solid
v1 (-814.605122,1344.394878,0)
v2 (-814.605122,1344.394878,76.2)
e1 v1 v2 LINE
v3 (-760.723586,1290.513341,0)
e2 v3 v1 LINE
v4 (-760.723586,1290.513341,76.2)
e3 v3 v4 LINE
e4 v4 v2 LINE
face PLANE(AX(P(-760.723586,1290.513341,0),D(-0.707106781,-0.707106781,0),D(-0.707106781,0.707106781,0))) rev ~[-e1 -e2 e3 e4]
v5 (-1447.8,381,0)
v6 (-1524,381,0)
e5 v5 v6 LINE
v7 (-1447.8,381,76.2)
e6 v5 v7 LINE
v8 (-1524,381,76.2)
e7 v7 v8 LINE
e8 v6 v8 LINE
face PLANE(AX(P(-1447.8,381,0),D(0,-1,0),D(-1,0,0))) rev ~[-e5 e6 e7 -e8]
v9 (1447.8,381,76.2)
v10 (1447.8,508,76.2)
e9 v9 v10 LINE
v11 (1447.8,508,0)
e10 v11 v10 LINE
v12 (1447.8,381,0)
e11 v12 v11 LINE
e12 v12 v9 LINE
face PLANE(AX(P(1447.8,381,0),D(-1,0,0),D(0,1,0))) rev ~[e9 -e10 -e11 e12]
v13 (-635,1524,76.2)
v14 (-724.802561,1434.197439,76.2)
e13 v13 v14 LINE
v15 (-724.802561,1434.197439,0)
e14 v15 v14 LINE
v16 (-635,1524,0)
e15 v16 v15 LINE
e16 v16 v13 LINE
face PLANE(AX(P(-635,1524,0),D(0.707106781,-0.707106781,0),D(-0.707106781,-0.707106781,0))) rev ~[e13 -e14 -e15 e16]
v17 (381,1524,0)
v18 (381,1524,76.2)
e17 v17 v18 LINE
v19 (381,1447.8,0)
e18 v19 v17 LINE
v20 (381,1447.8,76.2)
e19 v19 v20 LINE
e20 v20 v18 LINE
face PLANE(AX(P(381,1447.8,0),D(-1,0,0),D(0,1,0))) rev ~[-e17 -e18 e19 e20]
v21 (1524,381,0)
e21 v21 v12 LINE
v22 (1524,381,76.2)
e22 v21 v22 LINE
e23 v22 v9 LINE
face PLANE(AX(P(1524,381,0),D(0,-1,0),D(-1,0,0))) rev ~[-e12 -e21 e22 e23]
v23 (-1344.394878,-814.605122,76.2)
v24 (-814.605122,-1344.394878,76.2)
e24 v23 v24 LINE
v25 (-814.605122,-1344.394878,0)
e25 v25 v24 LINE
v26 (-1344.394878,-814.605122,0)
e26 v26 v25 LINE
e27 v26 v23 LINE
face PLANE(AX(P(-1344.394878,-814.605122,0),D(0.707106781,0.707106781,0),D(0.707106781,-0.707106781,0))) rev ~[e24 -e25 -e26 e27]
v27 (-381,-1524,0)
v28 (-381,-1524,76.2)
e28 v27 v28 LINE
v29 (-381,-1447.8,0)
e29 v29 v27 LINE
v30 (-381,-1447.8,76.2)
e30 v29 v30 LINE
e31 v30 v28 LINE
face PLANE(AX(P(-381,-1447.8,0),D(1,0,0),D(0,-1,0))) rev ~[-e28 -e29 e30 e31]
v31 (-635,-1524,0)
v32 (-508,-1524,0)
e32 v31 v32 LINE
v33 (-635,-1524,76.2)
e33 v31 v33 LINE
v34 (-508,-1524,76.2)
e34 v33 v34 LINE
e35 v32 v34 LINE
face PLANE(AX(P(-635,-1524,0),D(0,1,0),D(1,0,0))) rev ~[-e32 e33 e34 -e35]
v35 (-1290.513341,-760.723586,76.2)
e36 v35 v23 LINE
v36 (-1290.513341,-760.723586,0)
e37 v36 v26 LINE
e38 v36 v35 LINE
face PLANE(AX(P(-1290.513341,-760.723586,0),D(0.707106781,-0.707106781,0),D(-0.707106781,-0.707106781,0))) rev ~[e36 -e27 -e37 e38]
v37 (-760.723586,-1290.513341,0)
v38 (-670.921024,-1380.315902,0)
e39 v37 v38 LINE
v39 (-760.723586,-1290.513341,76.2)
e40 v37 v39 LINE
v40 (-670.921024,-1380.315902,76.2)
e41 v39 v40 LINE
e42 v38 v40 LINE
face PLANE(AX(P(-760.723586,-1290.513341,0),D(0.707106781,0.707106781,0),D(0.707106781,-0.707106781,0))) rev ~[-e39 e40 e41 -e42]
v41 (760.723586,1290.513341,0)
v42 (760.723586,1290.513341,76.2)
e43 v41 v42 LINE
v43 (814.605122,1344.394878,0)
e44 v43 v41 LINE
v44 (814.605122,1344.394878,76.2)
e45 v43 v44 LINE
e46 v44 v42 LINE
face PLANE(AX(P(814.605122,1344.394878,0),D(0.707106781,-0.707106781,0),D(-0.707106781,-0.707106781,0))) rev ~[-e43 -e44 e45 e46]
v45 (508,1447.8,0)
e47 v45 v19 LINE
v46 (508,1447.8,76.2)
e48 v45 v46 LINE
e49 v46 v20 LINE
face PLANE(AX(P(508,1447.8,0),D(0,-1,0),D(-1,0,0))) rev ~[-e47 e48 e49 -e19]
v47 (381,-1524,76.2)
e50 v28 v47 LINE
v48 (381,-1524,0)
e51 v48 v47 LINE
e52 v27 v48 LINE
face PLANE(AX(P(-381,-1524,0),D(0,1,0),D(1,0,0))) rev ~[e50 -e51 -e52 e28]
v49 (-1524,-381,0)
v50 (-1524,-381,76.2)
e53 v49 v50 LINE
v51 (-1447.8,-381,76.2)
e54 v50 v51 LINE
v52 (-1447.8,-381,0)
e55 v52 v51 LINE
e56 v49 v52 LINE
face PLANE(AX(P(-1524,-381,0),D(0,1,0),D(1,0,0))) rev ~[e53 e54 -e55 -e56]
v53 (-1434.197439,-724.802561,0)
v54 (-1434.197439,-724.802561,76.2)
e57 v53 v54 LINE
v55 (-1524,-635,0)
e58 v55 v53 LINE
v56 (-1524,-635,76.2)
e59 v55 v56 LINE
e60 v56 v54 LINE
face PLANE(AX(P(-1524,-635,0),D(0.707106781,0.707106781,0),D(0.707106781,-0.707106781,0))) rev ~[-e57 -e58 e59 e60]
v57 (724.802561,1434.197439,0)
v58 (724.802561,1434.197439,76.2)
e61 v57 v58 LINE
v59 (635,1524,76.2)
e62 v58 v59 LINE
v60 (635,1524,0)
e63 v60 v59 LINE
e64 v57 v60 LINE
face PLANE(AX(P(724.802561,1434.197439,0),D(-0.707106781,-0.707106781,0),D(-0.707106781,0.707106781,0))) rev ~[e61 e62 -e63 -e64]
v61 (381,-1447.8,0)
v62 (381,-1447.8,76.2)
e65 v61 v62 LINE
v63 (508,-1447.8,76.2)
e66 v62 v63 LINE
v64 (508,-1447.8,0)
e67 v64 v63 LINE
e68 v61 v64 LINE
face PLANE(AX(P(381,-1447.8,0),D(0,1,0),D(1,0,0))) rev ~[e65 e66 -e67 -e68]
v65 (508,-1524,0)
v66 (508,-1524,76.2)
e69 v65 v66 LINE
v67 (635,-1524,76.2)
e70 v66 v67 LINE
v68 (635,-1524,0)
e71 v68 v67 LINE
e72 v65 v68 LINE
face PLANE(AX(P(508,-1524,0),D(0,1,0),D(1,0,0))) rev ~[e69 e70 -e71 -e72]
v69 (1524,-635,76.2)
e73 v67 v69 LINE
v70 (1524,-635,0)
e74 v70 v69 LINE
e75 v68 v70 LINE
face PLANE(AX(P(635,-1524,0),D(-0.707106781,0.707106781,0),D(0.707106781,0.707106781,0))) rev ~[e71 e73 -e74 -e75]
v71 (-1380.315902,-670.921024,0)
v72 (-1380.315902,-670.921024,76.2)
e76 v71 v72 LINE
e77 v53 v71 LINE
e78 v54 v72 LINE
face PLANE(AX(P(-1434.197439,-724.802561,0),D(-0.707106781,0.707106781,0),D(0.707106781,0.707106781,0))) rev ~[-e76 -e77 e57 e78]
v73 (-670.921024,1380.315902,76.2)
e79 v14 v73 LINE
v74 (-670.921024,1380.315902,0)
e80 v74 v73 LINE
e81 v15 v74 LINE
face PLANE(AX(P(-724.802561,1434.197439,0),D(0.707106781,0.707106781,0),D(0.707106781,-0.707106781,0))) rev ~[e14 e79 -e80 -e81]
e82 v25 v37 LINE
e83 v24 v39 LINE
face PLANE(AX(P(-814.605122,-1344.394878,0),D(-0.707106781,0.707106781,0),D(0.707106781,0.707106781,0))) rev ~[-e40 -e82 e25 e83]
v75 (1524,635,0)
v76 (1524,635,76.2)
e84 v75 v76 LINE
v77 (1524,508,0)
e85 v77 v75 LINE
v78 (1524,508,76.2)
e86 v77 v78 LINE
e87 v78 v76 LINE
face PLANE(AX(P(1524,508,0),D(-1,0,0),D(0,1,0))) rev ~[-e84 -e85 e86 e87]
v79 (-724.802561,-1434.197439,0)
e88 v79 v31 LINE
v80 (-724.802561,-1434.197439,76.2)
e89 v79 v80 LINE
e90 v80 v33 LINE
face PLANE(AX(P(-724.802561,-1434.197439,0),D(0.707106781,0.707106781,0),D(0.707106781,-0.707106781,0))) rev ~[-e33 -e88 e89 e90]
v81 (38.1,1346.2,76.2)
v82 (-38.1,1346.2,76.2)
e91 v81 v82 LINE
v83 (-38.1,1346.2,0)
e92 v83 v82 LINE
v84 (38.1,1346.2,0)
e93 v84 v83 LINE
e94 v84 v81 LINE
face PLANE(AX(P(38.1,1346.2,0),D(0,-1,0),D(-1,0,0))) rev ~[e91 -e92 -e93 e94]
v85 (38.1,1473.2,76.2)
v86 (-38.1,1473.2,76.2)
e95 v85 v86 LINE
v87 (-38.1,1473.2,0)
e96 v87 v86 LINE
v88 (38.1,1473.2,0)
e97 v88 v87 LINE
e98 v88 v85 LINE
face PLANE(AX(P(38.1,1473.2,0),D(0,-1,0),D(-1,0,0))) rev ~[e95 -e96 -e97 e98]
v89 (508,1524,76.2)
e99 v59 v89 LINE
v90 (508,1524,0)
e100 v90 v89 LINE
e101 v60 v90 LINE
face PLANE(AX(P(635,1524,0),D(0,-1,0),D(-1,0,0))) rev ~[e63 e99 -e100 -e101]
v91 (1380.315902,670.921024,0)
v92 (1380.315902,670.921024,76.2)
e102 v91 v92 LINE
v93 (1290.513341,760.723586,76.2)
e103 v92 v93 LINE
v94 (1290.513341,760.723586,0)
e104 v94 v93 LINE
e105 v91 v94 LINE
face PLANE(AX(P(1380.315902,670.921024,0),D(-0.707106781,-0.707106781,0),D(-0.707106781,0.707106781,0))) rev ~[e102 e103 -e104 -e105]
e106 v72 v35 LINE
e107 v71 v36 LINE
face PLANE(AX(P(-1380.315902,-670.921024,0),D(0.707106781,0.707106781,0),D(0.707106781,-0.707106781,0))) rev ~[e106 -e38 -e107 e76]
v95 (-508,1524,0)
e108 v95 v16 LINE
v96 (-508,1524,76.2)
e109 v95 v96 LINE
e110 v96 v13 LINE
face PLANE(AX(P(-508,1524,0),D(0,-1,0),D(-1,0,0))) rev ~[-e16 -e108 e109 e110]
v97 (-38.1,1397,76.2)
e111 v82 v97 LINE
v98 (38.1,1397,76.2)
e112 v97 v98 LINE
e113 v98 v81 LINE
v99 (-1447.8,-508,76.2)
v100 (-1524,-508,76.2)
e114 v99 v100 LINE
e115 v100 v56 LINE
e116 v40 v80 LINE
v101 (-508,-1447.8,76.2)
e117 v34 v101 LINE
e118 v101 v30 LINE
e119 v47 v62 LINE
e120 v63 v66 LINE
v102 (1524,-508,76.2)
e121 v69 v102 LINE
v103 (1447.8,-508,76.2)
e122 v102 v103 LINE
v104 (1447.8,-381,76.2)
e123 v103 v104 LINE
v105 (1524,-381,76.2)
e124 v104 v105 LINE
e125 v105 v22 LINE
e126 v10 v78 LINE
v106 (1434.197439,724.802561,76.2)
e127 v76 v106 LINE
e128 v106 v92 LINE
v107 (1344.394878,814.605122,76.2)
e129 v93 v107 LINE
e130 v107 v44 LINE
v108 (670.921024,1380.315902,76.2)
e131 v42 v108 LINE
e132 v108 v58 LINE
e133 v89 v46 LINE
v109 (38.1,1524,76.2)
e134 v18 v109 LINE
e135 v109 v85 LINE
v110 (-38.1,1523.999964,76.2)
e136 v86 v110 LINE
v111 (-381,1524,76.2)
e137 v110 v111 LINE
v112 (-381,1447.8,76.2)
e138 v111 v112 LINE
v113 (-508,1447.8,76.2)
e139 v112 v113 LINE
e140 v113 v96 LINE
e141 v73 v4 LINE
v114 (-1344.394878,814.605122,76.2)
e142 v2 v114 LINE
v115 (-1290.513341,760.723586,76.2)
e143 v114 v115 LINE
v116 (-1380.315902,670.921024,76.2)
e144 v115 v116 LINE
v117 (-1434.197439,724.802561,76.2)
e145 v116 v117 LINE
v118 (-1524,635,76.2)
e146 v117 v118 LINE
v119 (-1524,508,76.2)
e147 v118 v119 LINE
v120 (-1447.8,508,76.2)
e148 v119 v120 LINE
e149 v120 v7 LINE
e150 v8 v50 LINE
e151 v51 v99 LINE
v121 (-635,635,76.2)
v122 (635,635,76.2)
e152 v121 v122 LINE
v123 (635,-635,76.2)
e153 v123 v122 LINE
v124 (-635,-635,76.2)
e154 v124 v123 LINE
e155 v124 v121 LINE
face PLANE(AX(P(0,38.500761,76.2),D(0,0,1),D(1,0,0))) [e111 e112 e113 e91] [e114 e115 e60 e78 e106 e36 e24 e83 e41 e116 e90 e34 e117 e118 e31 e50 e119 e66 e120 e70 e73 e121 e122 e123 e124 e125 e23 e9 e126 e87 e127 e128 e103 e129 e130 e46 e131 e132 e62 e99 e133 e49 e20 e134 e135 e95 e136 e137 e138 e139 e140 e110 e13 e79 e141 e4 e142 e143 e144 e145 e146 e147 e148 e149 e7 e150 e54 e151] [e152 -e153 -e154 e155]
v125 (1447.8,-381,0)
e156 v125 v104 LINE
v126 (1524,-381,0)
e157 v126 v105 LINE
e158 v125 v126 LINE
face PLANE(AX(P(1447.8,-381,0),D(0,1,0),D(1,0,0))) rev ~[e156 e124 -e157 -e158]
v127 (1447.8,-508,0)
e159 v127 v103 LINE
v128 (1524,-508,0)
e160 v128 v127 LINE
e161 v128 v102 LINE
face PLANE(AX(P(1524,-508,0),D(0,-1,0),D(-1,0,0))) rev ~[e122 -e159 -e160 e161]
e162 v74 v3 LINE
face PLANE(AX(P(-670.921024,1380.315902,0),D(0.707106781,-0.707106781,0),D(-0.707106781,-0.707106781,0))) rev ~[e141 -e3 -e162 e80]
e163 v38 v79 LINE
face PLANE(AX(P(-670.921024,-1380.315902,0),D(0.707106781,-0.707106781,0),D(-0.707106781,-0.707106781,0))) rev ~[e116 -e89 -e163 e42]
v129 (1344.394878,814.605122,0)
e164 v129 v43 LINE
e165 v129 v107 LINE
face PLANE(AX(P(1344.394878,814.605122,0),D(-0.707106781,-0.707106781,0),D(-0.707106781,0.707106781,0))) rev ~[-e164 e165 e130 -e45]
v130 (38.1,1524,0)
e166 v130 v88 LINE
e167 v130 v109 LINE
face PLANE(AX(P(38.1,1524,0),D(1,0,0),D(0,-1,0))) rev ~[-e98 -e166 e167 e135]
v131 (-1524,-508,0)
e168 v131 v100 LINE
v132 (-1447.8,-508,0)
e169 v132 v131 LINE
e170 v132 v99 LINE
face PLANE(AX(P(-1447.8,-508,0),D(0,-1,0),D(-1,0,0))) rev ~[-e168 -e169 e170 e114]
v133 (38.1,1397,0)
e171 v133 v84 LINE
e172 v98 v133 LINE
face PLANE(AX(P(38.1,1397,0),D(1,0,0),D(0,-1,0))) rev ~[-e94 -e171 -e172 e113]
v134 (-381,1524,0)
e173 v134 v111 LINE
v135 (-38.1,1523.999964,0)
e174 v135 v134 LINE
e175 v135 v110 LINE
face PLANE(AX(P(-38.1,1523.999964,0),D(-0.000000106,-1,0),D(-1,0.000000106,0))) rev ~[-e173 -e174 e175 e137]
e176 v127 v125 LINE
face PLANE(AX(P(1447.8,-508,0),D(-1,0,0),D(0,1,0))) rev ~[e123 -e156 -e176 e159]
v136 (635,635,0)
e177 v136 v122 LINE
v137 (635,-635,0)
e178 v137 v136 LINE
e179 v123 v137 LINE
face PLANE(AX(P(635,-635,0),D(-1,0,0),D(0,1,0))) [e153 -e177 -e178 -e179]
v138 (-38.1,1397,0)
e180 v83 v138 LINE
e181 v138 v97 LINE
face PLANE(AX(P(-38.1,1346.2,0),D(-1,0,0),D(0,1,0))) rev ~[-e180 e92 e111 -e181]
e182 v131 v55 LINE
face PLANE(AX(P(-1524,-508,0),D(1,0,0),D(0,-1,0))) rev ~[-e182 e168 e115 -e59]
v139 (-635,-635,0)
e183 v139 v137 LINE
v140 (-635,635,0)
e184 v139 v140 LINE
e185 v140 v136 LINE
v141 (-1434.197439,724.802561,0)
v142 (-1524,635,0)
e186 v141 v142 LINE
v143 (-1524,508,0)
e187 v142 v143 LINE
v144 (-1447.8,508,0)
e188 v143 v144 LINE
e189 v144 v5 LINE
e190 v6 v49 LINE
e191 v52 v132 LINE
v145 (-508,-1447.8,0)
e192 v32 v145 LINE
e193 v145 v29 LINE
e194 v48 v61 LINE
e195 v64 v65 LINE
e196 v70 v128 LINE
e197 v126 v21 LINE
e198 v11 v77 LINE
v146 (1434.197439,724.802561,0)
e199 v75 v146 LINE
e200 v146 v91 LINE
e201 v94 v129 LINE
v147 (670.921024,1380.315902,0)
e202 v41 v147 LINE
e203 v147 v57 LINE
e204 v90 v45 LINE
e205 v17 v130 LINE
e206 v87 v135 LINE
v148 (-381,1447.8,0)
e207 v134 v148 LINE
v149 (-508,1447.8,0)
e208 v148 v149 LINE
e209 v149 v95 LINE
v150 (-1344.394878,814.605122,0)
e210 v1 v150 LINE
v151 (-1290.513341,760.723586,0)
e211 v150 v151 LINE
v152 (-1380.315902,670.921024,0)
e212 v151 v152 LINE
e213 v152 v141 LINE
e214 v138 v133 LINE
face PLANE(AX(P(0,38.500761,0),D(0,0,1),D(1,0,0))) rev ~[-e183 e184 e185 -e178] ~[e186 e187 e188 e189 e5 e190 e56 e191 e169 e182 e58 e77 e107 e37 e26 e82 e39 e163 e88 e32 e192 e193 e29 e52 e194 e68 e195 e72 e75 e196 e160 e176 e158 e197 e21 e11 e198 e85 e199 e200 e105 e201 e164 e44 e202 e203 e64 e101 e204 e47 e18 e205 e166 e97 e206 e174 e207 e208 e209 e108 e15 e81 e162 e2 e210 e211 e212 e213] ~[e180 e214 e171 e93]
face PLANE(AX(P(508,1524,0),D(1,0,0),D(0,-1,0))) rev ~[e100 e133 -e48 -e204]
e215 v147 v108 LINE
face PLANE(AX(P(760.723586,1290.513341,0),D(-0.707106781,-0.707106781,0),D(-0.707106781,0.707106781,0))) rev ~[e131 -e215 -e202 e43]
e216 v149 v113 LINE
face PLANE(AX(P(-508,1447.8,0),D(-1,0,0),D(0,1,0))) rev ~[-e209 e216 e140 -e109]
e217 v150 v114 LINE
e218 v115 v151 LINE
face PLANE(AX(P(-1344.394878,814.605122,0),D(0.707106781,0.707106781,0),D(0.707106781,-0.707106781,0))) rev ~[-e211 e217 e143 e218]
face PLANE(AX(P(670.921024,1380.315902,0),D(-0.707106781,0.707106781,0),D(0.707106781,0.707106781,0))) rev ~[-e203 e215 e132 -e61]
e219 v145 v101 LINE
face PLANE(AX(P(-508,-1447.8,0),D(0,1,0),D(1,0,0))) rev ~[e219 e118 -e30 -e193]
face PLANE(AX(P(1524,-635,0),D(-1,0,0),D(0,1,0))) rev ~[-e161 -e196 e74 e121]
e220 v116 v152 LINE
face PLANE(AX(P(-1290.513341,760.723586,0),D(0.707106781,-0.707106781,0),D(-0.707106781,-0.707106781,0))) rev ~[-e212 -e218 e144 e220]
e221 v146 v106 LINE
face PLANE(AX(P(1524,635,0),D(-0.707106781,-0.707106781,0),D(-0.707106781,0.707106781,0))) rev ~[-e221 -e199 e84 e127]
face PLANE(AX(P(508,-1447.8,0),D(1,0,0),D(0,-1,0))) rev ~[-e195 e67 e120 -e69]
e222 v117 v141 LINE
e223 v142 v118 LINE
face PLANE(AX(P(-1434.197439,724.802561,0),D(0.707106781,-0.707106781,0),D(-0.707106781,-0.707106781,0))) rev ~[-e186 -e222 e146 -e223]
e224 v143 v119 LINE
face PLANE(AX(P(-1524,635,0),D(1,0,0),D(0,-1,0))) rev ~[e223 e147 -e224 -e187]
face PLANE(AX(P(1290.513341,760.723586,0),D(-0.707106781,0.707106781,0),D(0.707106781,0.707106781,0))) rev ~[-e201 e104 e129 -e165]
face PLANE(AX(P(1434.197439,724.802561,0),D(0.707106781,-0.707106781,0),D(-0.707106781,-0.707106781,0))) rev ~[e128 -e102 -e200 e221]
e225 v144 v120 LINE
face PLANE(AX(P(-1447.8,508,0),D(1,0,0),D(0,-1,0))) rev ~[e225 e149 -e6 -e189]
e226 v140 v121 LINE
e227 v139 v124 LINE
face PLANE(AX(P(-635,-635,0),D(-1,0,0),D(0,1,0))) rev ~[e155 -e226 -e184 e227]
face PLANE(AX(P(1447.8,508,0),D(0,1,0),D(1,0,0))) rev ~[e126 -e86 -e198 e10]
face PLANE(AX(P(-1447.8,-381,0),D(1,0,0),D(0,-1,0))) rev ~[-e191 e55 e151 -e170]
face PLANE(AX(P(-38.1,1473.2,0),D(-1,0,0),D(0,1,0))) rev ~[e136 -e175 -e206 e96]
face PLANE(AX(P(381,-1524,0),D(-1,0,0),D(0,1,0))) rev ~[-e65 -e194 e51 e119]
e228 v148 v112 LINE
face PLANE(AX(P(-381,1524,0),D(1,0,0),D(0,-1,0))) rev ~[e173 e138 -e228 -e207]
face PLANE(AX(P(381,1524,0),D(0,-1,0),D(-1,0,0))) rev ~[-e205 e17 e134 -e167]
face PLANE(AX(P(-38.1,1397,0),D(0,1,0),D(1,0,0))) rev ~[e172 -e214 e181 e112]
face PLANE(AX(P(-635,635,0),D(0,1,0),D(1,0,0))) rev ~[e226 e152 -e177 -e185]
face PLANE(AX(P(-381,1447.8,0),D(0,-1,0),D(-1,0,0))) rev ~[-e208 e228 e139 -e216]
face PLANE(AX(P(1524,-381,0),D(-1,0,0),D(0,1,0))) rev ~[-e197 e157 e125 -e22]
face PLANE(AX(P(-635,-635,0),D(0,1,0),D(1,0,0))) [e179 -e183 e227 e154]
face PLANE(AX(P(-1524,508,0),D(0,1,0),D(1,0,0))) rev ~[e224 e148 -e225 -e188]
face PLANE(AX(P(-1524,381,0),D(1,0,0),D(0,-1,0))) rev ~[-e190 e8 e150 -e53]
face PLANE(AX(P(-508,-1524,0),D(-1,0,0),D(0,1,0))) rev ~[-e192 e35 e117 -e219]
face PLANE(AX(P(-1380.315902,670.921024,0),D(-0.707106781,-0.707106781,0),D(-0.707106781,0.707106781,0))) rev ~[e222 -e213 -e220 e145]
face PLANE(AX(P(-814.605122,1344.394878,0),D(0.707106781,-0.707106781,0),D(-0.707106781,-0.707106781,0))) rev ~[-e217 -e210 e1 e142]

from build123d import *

# Parameters (mm, degrees)
F0_W     = 1270
F0_H     = 1270
F0_W_2   = 38.1
F0_H_2   = 76.2
F1_DEPTH = 25.4
F2_DEPTH = 76.2


# Not quite as in the source:
# - ends of sketch curves that miss each other by under 0.0002 mm in the source are joined


with BuildPart() as f1:
    # F0 (on Top) → F1 (new body)
    with BuildSketch(Plane.XY):
        Polygon((-1434.1974387893, 724.8025612107), (-1524, 635), (-1524, 508), (-1447.8, 508), (-1447.8, 381), (-1524, 381), (-1524, -381), (-1447.8, -381), (-1447.8, -508), (-1524, -508), (-1524, -635), (-1434.1974387893, -724.8025612107), (-1380.3159020629, -670.9210244843), (-1290.5133408522, -760.723585695), (-1344.3948775786, -814.6051224214), (-814.6051224214, -1344.3948775786), (-760.723585695, -1290.5133408522), (-670.9210244843, -1380.3159020629), (-724.8025612107, -1434.1974387893), (-635, -1524), (-508, -1524), (-508, -1447.8), (-381, -1447.8), (-381, -1524), (0, -1524), (381, -1524), (381, -1447.8), (508, -1447.8), (508, -1524), (635, -1524), (724.8025612107, -1434.1974387893), (670.9210244843, -1380.3159020629), (760.723585695, -1290.5133408522), (814.6051224214, -1344.3948775786), (1344.3948775786, -814.6051224214), (1290.5133408522, -760.723585695), (1380.3159020629, -670.9210244843), (1434.1974387893, -724.8025612107), (1524, -635), (1524, -508), (1447.8, -508), (1447.8, -381), (1524, -381), (1524, 381), (1447.8, 381), (1447.8, 508), (1524, 508), (1524, 635), (1434.1974387893, 724.8025612107), (1380.3159020629, 670.9210244843), (1290.5133408522, 760.723585695), (1344.3948775786, 814.6051224214), (814.6051224214, 1344.3948775786), (760.723585695, 1290.5133408522), (670.9210244843, 1380.3159020629), (724.8025612107, 1434.1974387893), (635, 1524), (508, 1524), (508, 1447.8), (381, 1447.8), (381, 1524), (38.1, 1524), (38.1, 1473.2), (38.1, 1397), (38.1, 1346.2), (-38.1, 1346.2), (-38.1, 1397), (-38.1, 1473.2), (-38.1, 1523.9999635696), (-381, 1524), (-381, 1447.8), (-508, 1447.8), (-508, 1524), (-635, 1524), (-724.8025612107, 1434.1974387893), (-670.9210244843, 1380.3159020629), (-760.723585695, 1290.5133408522), (-814.6051224214, 1344.3948775786), (-1344.3948775786, 814.6051224214), (-1290.5133408522, 760.723585695), (-1380.3159020629, 670.9210244843), align=None)
        Rectangle(F0_W, F0_H, mode=Mode.SUBTRACT)
        with Locations((-19.05, 1435.1)):
            Rectangle(F0_W_2, F0_H_2)
        with Locations((19.05, 1435.1)):
            Rectangle(F0_W_2, F0_H_2)
        Polygon((670.9210244843, -1380.3159020629), (724.8025612107, -1434.1974387893), (814.6051224214, -1344.3948775786), (760.723585695, -1290.5133408522), align=None)
        Polygon((1290.5133408522, -760.723585695), (1344.3948775786, -814.6051224214), (1434.1974387893, -724.8025612107), (1380.3159020629, -670.9210244843), align=None)
    extrude(amount=F1_DEPTH)

    # F0 (on Top) → F2 (join)
    with BuildSketch(Plane.XY):
        Polygon((-1434.1974387893, 724.8025612107), (-1524, 635), (-1524, 508), (-1447.8, 508), (-1447.8, 381), (-1524, 381), (-1524, -381), (-1447.8, -381), (-1447.8, -508), (-1524, -508), (-1524, -635), (-1434.1974387893, -724.8025612107), (-1380.3159020629, -670.9210244843), (-1290.5133408522, -760.723585695), (-1344.3948775786, -814.6051224214), (-814.6051224214, -1344.3948775786), (-760.723585695, -1290.5133408522), (-670.9210244843, -1380.3159020629), (-724.8025612107, -1434.1974387893), (-635, -1524), (-508, -1524), (-508, -1447.8), (-381, -1447.8), (-381, -1524), (0, -1524), (381, -1524), (381, -1447.8), (508, -1447.8), (508, -1524), (635, -1524), (724.8025612107, -1434.1974387893), (670.9210244843, -1380.3159020629), (760.723585695, -1290.5133408522), (814.6051224214, -1344.3948775786), (1344.3948775786, -814.6051224214), (1290.5133408522, -760.723585695), (1380.3159020629, -670.9210244843), (1434.1974387893, -724.8025612107), (1524, -635), (1524, -508), (1447.8, -508), (1447.8, -381), (1524, -381), (1524, 381), (1447.8, 381), (1447.8, 508), (1524, 508), (1524, 635), (1434.1974387893, 724.8025612107), (1380.3159020629, 670.9210244843), (1290.5133408522, 760.723585695), (1344.3948775786, 814.6051224214), (814.6051224214, 1344.3948775786), (760.723585695, 1290.5133408522), (670.9210244843, 1380.3159020629), (724.8025612107, 1434.1974387893), (635, 1524), (508, 1524), (508, 1447.8), (381, 1447.8), (381, 1524), (38.1, 1524), (38.1, 1473.2), (38.1, 1397), (38.1, 1346.2), (-38.1, 1346.2), (-38.1, 1397), (-38.1, 1473.2), (-38.1, 1523.9999635696), (-381, 1524), (-381, 1447.8), (-508, 1447.8), (-508, 1524), (-635, 1524), (-724.8025612107, 1434.1974387893), (-670.9210244843, 1380.3159020629), (-760.723585695, 1290.5133408522), (-814.6051224214, 1344.3948775786), (-1344.3948775786, 814.6051224214), (-1290.5133408522, 760.723585695), (-1380.3159020629, 670.9210244843), align=None)
        Rectangle(F0_W, F0_H, mode=Mode.SUBTRACT)
        with Locations((-19.05, 1435.1)):
            Rectangle(F0_W_2, F0_H_2)
        with Locations((19.05, 1435.1)):
            Rectangle(F0_W_2, F0_H_2)
        Polygon((670.9210244843, -1380.3159020629), (724.8025612107, -1434.1974387893), (814.6051224214, -1344.3948775786), (760.723585695, -1290.5133408522), align=None)
        Polygon((1290.5133408522, -760.723585695), (1344.3948775786, -814.6051224214), (1434.1974387893, -724.8025612107), (1380.3159020629, -670.9210244843), align=None)
    extrude(amount=F2_DEPTH)


solid = f1.part
